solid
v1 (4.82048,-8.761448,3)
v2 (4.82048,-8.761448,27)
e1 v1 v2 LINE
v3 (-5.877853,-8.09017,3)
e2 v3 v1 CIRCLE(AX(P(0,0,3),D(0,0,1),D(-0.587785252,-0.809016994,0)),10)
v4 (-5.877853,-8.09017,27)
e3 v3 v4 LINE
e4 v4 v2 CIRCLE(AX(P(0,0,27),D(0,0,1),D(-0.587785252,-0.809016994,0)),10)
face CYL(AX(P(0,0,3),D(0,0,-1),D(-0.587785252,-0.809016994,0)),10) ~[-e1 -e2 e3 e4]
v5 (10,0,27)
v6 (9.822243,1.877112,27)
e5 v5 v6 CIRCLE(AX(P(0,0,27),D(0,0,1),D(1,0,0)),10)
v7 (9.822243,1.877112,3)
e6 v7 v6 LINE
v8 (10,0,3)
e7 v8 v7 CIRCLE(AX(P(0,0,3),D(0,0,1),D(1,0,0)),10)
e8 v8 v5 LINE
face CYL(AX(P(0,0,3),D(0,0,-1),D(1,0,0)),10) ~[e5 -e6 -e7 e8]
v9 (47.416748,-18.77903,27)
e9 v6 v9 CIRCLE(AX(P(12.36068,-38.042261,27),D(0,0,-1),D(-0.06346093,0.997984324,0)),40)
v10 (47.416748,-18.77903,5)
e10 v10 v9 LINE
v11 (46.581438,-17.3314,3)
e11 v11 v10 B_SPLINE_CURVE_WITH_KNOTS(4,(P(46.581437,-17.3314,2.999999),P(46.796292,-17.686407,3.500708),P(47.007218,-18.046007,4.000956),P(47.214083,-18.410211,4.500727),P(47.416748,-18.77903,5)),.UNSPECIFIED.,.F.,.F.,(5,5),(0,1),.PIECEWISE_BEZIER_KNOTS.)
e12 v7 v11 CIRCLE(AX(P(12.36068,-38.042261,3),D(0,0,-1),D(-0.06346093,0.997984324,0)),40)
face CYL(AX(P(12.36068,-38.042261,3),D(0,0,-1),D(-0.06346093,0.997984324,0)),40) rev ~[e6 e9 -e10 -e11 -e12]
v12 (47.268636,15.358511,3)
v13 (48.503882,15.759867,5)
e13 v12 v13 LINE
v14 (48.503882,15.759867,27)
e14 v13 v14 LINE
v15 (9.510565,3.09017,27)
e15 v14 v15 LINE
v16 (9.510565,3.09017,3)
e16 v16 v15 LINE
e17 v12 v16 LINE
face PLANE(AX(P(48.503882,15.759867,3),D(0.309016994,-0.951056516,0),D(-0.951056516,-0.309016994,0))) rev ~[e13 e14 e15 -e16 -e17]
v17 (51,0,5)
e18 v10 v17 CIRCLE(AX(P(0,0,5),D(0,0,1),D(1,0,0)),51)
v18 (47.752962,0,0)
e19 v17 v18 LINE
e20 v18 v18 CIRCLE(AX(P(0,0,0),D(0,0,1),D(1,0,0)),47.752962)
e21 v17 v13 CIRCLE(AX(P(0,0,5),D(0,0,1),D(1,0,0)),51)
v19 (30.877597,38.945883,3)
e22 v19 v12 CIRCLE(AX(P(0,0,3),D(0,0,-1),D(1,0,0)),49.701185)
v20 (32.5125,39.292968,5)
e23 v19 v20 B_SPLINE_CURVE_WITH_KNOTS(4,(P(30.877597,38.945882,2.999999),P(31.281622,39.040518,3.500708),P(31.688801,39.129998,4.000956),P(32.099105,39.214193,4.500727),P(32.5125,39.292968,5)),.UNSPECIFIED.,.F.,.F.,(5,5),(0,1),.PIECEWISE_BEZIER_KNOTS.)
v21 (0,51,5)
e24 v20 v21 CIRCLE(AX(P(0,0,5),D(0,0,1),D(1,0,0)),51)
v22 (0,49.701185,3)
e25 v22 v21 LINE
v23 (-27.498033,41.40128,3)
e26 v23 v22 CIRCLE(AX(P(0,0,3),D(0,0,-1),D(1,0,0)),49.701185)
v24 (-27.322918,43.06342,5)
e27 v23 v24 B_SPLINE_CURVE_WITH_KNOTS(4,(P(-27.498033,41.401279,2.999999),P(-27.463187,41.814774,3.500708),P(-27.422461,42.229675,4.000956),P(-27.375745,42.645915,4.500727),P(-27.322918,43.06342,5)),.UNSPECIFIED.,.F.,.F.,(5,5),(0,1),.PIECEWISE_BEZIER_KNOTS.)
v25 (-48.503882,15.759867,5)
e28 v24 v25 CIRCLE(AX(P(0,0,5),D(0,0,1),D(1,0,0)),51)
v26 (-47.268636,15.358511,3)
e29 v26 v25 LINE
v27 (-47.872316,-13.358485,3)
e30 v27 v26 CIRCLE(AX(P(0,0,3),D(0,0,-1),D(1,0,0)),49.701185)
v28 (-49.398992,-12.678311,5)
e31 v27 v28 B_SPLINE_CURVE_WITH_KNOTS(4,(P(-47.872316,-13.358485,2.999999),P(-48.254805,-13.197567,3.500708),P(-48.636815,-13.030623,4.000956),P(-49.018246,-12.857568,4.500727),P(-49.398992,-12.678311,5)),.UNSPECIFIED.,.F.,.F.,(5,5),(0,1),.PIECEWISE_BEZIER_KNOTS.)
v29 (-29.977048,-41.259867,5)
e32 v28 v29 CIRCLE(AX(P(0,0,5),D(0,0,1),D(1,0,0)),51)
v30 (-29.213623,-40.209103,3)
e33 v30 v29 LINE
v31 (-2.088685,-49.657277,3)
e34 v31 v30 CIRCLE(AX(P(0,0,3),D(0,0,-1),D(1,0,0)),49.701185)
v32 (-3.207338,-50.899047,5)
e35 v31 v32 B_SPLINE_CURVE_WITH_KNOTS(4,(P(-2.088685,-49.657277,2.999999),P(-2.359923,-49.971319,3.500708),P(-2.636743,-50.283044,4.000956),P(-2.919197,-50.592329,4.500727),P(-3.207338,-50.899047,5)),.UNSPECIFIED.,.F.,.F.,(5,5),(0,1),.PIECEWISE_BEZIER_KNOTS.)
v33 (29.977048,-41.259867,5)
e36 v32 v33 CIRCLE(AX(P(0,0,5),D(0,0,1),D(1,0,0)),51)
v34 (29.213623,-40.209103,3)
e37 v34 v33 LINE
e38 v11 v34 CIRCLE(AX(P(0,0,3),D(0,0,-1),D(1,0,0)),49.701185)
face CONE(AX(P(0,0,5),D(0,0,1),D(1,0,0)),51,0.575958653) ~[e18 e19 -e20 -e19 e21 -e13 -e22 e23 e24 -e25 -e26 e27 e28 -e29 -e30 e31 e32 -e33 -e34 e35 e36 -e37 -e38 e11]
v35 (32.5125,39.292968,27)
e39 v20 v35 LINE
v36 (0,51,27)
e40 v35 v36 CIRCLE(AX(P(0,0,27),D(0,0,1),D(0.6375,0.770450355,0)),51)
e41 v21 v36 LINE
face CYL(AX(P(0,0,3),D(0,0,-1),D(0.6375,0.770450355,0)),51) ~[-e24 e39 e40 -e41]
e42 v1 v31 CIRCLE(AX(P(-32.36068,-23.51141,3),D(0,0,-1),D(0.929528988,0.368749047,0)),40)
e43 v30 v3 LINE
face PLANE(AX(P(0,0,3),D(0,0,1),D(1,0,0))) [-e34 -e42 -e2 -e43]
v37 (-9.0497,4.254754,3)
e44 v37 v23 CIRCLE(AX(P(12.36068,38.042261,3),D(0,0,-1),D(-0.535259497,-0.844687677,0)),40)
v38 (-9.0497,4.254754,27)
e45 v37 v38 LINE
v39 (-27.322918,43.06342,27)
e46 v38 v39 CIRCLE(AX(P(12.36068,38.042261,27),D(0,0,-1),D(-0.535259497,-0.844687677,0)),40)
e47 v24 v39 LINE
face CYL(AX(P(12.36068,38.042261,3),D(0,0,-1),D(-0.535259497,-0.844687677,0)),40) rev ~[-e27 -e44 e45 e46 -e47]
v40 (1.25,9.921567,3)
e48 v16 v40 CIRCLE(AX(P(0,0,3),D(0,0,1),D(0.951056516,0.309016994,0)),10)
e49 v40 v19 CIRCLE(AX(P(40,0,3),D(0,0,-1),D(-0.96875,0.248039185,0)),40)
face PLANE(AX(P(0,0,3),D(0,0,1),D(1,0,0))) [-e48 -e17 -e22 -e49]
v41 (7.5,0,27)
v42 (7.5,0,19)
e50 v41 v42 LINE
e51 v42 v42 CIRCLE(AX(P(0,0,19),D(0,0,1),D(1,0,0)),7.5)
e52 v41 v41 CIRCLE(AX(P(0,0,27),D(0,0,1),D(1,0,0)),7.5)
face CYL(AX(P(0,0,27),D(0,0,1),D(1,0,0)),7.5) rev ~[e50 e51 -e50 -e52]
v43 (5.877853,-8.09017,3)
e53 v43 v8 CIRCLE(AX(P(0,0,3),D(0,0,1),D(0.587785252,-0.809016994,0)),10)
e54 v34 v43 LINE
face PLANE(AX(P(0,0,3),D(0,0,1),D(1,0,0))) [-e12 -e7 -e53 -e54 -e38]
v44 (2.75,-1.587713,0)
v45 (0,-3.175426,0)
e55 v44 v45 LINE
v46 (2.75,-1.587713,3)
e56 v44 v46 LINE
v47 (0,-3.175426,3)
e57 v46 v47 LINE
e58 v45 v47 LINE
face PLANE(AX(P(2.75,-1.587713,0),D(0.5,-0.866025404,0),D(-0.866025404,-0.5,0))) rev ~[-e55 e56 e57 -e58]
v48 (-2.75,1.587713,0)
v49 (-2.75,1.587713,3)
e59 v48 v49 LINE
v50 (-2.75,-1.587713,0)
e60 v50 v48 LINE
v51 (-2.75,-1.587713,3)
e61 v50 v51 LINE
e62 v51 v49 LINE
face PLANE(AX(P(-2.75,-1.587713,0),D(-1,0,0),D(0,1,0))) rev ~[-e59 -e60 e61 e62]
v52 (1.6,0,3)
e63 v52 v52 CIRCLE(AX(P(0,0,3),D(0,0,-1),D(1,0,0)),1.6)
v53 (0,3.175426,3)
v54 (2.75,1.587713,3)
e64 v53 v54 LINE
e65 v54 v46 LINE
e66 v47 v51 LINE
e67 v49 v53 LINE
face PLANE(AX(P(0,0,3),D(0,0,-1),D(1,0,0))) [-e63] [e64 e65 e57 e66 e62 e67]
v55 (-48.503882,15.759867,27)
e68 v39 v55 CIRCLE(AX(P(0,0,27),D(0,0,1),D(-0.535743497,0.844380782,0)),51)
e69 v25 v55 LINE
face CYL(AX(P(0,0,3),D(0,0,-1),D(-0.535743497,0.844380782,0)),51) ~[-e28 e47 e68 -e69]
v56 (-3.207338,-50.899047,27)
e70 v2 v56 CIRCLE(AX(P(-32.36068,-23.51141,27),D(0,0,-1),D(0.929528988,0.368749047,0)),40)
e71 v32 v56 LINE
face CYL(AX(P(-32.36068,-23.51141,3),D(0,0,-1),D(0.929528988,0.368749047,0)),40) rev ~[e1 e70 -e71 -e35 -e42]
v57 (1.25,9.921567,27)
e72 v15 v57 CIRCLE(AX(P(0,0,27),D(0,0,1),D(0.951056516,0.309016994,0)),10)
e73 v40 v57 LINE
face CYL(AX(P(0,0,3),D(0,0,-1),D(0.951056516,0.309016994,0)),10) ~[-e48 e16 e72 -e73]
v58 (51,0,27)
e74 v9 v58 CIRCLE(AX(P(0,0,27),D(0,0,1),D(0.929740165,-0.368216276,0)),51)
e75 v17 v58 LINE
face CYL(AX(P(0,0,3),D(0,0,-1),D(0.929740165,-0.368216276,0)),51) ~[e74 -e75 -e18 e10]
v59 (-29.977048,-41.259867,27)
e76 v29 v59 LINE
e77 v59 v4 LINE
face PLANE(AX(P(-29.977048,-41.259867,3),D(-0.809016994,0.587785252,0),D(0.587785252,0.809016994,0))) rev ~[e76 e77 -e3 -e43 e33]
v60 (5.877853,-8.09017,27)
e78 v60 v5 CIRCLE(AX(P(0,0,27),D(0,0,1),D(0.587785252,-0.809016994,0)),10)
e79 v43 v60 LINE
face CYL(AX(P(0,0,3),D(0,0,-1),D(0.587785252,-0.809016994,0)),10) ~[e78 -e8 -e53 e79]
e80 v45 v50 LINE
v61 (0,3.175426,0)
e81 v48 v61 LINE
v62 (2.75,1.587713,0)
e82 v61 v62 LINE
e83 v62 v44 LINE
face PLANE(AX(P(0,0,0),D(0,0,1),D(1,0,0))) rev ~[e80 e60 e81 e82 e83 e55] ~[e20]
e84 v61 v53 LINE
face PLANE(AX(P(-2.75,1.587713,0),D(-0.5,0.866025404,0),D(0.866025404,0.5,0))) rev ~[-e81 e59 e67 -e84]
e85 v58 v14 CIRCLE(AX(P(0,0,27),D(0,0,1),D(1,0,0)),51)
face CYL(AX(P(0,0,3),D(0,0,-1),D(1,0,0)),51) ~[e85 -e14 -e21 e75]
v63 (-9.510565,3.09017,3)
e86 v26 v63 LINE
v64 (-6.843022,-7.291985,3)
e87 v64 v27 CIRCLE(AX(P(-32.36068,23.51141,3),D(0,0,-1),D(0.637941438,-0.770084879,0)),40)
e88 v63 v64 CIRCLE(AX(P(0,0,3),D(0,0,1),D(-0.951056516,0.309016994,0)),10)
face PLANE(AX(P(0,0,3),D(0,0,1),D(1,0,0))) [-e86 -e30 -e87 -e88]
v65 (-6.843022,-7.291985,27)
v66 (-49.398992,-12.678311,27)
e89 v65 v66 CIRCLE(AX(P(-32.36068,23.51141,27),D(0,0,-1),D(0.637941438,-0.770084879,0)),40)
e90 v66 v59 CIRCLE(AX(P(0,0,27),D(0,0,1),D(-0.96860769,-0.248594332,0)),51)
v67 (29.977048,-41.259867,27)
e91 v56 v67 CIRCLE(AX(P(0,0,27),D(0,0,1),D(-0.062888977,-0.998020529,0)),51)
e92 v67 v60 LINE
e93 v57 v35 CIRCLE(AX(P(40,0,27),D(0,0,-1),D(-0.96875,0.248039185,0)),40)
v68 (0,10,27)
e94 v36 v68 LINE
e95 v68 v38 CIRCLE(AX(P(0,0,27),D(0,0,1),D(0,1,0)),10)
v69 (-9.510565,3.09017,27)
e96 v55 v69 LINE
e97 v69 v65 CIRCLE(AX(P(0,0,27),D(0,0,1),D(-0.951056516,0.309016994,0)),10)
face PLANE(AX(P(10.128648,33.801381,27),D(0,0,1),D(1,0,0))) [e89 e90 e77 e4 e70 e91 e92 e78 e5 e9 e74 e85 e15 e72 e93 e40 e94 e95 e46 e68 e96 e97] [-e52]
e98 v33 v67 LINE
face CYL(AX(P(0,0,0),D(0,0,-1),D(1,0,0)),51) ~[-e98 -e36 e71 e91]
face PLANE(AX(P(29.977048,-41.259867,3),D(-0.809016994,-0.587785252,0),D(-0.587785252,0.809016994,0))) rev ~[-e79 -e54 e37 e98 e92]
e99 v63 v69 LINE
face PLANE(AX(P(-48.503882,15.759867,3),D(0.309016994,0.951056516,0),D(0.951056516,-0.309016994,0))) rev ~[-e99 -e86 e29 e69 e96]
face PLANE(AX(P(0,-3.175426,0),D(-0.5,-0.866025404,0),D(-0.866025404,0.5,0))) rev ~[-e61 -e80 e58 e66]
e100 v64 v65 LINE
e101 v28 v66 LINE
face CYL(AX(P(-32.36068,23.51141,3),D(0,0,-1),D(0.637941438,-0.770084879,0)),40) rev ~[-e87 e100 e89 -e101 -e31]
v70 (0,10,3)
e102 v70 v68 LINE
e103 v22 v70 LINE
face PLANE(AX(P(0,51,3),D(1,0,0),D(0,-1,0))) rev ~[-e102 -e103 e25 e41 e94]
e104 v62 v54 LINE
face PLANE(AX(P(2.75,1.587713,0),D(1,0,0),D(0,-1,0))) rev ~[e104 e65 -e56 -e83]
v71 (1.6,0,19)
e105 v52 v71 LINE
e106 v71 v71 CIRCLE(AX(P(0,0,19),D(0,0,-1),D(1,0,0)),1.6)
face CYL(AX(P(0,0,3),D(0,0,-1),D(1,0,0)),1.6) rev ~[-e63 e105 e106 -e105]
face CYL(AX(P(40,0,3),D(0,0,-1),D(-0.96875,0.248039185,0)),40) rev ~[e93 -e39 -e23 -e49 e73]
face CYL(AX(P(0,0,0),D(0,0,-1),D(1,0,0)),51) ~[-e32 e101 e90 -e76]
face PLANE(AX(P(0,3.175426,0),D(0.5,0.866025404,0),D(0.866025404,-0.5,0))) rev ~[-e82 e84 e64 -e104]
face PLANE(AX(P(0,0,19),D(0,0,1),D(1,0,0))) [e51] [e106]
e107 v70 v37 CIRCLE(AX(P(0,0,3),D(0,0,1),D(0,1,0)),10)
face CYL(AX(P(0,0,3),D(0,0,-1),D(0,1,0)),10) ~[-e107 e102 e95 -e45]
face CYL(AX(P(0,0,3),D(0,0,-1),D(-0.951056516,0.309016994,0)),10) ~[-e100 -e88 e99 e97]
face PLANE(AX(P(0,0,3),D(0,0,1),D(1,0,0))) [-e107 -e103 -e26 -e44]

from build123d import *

# Parameters (mm, degrees)
F0_R     = 51
F1_DEPTH = 3
F3_DEPTH = 24
F5_DEPTH = 3
F6_R     = 1.6
F7_DEPTH = 24.001
F8_R     = 7.5
F9_DEPTH = 8


# Not quite as in the source:
# - a fillet or chamfer that OpenCascade refuses, or shapes differently, is made with other operations: its cross-section is extruded or revolved along the edge and cut away or added


with BuildPart() as f1:
    # F0 (on Top) → F1 (new body)
    with BuildSketch(Plane.XY):
        Circle(F0_R)
    extrude(amount=F1_DEPTH)

    # F2 (on face) → F3 (join)
    with BuildSketch(Plane.XY.offset(3)):
        with BuildLine():
            Line((0, 51), (0, 10))
            ThreePointArc((0, 10), (0.6262291254, 9.9803725924), (1.25, 9.9215674165))
            ThreePointArc((1.25, 9.9215674165), (12.6111994349, 29.1522486886), (32.5125, 39.2929681209))
            ThreePointArc((32.5125, 39.2929681209), (17.2780008368, 47.9840670127), (0, 51))
        make_face()
        with BuildLine():
            Line((48.5038823311, 15.7598667131), (9.510565163, 3.0901699437))
            ThreePointArc((9.510565163, 3.0901699437), (9.6854138312, 2.4885254508), (9.8222425863, 1.8771122972))
            ThreePointArc((9.8222425863, 1.8771122972), (31.6225110248, -2.9854231318), (47.4167484056, -18.7790300773))
            ThreePointArc((47.4167484056, -18.7790300773), (50.0961783407, -9.5589181217), (51, 0))
            ThreePointArc((51, 0), (50.3721053704, 7.9781577171), (48.5038823311, 15.7598667131))
        make_face()
        with BuildLine():
            Line((29.9770478669, -41.2598667131), (5.8778525229, -8.0901699437))
            ThreePointArc((5.8778525229, -8.0901699437), (5.3596858173, -8.4423792819), (4.8204797641, -8.7614482161))
            ThreePointArc((4.8204797641, -8.7614482161), (6.9325871881, -30.9973416549), (-3.2073378494, -50.8990469844))
            ThreePointArc((-3.2073378494, -50.8990469844), (14.2261306293, -48.9756797535), (29.9770478669, -41.2598667131))
        make_face()
        with BuildLine():
            Line((-29.9770478669, -41.2598667131), (-5.8778525229, -8.0901699437))
            ThreePointArc((-5.8778525229, -8.0901699437), (-6.372945827, -7.7062027929), (-6.84302225, -7.2919850854))
            ThreePointArc((-6.84302225, -7.2919850854), (-27.3379365126, -16.1719875718), (-49.3989922099, -12.6783109541))
            ThreePointArc((-49.3989922099, -12.6783109541), (-42.1825232409, -28.6641715916), (-29.9770478669, -41.2598667131))
        make_face()
        with BuildLine():
            Line((-48.5038823311, 15.7598667131), (-9.510565163, 3.0901699437))
            ThreePointArc((-9.510565163, 3.0901699437), (-9.2983829469, 3.6796840317), (-9.0497001003, 4.2547535879))
            ThreePointArc((-9.0497001003, 4.2547535879), (-23.8283611351, 21.0025036698), (-27.3229183463, 43.0634198948))
            ThreePointArc((-27.3229183463, 43.0634198948), (-40.2963637234, 31.2602474506), (-48.5038823311, 15.7598667131))
        make_face()
        with BuildLine():
            ThreePointArc((-9.0497001003, 4.2547535879), (-4.6583345766, 1.8434602504), (0, 0))
            Line((0, 0), (0, 10))
            ThreePointArc((0, 10), (-5.3596858173, 8.4423792819), (-9.0497001003, 4.2547535879))
        make_face()
        with BuildLine():
            Line((-9.510565163, 3.0901699437), (0, 0))
            ThreePointArc((0, 0), (-4.6583345766, 1.8434602504), (-9.0497001003, 4.2547535879))
            ThreePointArc((-9.0497001003, 4.2547535879), (-9.2983829469, 3.6796840317), (-9.510565163, 3.0901699437))
        make_face()
        with BuildLine():
            ThreePointArc((-6.84302225, -7.2919850854), (-3.1927394333, -3.8606789083), (0, 0))
            Line((0, 0), (-9.510565163, 3.0901699437))
            ThreePointArc((-9.510565163, 3.0901699437), (-9.6854138312, -2.4885254508), (-6.84302225, -7.2919850854))
        make_face()
        with BuildLine():
            ThreePointArc((4.8204797641, -8.7614482161), (2.6851130896, -4.2294910354), (0, 0))
            Line((0, 0), (-5.8778525229, -8.0901699437))
            ThreePointArc((-5.8778525229, -8.0901699437), (-0.6262291254, -9.9803725924), (4.8204797641, -8.7614482161))
        make_face()
        with BuildLine():
            Line((-5.8778525229, -8.0901699437), (0, 0))
            ThreePointArc((0, 0), (-3.1927394333, -3.8606789083), (-6.84302225, -7.2919850854))
            ThreePointArc((-6.84302225, -7.2919850854), (-6.372945827, -7.7062027929), (-5.8778525229, -8.0901699437))
        make_face()
        with BuildLine():
            Line((5.8778525229, -8.0901699437), (0, 0))
            ThreePointArc((0, 0), (2.6851130896, -4.2294910354), (4.8204797641, -8.7614482161))
            ThreePointArc((4.8204797641, -8.7614482161), (5.3596858173, -8.4423792819), (5.8778525229, -8.0901699437))
        make_face()
        with BuildLine():
            ThreePointArc((9.8222425863, 1.8771122972), (4.8522305863, 1.2467096933), (0, 0))
            Line((0, 0), (5.8778525229, -8.0901699437))
            ThreePointArc((5.8778525229, -8.0901699437), (8.9100652419, -4.5399049974), (10, 0))
            ThreePointArc((10, 0), (9.9554614625, 0.9427550417), (9.8222425863, 1.8771122972))
        make_face()
        with BuildLine():
            Line((9.510565163, 3.0901699437), (0, 0))
            ThreePointArc((0, 0), (4.8522305863, 1.2467096933), (9.8222425863, 1.8771122972))
            ThreePointArc((9.8222425863, 1.8771122972), (9.6854138312, 2.4885254508), (9.510565163, 3.0901699437))
        make_face()
        with BuildLine():
            ThreePointArc((1.25, 9.9215674165), (0.313730334, 5), (0, 0))
            Line((0, 0), (9.510565163, 3.0901699437))
            ThreePointArc((9.510565163, 3.0901699437), (6.372945827, 7.7062027929), (1.25, 9.9215674165))
        make_face()
        with BuildLine():
            Line((0, 10), (0, 0))
            ThreePointArc((0, 0), (0.313730334, 5), (1.25, 9.9215674165))
            ThreePointArc((1.25, 9.9215674165), (0.6262291254, 9.9803725924), (0, 10))
        make_face()
    extrude(amount=F3_DEPTH)

    # F4 (on face) → F5 (cut)
    with BuildSketch(Plane(origin=(0, 0, 0), x_dir=(1, 0, 0), z_dir=(0, 0, -1))):
        Polygon((2.75, -1.5877132403), (2.75, 1.5877132403), (0, 3.1754264805), (-2.75, 1.5877132403), (-2.75, -1.5877132403), (0, -3.1754264805), align=None)
    extrude(amount=-F5_DEPTH, mode=Mode.SUBTRACT)

    # F6 (on face) → F7 (cut, through all)
    with BuildSketch(Plane(origin=(0, 0, 3), x_dir=(1, 0, 0), z_dir=(0, 0, -1))):
        Circle(F6_R)
    extrude(amount=-F7_DEPTH, mode=Mode.SUBTRACT)

    # F8 (on face) → F9 (cut)
    with BuildSketch(Plane.XY.offset(27)):
        Circle(F8_R)
    extrude(amount=-F9_DEPTH, mode=Mode.SUBTRACT)

    # F10: chamfer of 5 x 3.247037966 on 1 edges, made by hand

    # F10_s1 → F10_t2 (revolve, cut)
    with BuildSketch(Plane.XZ):
        Polygon((51, 5), (47.752962034, 0), (51, 0), align=None)
    revolve(axis=Axis((0, 0, 0), (0, 0, 1)), mode=Mode.SUBTRACT)


solid = f1.part
